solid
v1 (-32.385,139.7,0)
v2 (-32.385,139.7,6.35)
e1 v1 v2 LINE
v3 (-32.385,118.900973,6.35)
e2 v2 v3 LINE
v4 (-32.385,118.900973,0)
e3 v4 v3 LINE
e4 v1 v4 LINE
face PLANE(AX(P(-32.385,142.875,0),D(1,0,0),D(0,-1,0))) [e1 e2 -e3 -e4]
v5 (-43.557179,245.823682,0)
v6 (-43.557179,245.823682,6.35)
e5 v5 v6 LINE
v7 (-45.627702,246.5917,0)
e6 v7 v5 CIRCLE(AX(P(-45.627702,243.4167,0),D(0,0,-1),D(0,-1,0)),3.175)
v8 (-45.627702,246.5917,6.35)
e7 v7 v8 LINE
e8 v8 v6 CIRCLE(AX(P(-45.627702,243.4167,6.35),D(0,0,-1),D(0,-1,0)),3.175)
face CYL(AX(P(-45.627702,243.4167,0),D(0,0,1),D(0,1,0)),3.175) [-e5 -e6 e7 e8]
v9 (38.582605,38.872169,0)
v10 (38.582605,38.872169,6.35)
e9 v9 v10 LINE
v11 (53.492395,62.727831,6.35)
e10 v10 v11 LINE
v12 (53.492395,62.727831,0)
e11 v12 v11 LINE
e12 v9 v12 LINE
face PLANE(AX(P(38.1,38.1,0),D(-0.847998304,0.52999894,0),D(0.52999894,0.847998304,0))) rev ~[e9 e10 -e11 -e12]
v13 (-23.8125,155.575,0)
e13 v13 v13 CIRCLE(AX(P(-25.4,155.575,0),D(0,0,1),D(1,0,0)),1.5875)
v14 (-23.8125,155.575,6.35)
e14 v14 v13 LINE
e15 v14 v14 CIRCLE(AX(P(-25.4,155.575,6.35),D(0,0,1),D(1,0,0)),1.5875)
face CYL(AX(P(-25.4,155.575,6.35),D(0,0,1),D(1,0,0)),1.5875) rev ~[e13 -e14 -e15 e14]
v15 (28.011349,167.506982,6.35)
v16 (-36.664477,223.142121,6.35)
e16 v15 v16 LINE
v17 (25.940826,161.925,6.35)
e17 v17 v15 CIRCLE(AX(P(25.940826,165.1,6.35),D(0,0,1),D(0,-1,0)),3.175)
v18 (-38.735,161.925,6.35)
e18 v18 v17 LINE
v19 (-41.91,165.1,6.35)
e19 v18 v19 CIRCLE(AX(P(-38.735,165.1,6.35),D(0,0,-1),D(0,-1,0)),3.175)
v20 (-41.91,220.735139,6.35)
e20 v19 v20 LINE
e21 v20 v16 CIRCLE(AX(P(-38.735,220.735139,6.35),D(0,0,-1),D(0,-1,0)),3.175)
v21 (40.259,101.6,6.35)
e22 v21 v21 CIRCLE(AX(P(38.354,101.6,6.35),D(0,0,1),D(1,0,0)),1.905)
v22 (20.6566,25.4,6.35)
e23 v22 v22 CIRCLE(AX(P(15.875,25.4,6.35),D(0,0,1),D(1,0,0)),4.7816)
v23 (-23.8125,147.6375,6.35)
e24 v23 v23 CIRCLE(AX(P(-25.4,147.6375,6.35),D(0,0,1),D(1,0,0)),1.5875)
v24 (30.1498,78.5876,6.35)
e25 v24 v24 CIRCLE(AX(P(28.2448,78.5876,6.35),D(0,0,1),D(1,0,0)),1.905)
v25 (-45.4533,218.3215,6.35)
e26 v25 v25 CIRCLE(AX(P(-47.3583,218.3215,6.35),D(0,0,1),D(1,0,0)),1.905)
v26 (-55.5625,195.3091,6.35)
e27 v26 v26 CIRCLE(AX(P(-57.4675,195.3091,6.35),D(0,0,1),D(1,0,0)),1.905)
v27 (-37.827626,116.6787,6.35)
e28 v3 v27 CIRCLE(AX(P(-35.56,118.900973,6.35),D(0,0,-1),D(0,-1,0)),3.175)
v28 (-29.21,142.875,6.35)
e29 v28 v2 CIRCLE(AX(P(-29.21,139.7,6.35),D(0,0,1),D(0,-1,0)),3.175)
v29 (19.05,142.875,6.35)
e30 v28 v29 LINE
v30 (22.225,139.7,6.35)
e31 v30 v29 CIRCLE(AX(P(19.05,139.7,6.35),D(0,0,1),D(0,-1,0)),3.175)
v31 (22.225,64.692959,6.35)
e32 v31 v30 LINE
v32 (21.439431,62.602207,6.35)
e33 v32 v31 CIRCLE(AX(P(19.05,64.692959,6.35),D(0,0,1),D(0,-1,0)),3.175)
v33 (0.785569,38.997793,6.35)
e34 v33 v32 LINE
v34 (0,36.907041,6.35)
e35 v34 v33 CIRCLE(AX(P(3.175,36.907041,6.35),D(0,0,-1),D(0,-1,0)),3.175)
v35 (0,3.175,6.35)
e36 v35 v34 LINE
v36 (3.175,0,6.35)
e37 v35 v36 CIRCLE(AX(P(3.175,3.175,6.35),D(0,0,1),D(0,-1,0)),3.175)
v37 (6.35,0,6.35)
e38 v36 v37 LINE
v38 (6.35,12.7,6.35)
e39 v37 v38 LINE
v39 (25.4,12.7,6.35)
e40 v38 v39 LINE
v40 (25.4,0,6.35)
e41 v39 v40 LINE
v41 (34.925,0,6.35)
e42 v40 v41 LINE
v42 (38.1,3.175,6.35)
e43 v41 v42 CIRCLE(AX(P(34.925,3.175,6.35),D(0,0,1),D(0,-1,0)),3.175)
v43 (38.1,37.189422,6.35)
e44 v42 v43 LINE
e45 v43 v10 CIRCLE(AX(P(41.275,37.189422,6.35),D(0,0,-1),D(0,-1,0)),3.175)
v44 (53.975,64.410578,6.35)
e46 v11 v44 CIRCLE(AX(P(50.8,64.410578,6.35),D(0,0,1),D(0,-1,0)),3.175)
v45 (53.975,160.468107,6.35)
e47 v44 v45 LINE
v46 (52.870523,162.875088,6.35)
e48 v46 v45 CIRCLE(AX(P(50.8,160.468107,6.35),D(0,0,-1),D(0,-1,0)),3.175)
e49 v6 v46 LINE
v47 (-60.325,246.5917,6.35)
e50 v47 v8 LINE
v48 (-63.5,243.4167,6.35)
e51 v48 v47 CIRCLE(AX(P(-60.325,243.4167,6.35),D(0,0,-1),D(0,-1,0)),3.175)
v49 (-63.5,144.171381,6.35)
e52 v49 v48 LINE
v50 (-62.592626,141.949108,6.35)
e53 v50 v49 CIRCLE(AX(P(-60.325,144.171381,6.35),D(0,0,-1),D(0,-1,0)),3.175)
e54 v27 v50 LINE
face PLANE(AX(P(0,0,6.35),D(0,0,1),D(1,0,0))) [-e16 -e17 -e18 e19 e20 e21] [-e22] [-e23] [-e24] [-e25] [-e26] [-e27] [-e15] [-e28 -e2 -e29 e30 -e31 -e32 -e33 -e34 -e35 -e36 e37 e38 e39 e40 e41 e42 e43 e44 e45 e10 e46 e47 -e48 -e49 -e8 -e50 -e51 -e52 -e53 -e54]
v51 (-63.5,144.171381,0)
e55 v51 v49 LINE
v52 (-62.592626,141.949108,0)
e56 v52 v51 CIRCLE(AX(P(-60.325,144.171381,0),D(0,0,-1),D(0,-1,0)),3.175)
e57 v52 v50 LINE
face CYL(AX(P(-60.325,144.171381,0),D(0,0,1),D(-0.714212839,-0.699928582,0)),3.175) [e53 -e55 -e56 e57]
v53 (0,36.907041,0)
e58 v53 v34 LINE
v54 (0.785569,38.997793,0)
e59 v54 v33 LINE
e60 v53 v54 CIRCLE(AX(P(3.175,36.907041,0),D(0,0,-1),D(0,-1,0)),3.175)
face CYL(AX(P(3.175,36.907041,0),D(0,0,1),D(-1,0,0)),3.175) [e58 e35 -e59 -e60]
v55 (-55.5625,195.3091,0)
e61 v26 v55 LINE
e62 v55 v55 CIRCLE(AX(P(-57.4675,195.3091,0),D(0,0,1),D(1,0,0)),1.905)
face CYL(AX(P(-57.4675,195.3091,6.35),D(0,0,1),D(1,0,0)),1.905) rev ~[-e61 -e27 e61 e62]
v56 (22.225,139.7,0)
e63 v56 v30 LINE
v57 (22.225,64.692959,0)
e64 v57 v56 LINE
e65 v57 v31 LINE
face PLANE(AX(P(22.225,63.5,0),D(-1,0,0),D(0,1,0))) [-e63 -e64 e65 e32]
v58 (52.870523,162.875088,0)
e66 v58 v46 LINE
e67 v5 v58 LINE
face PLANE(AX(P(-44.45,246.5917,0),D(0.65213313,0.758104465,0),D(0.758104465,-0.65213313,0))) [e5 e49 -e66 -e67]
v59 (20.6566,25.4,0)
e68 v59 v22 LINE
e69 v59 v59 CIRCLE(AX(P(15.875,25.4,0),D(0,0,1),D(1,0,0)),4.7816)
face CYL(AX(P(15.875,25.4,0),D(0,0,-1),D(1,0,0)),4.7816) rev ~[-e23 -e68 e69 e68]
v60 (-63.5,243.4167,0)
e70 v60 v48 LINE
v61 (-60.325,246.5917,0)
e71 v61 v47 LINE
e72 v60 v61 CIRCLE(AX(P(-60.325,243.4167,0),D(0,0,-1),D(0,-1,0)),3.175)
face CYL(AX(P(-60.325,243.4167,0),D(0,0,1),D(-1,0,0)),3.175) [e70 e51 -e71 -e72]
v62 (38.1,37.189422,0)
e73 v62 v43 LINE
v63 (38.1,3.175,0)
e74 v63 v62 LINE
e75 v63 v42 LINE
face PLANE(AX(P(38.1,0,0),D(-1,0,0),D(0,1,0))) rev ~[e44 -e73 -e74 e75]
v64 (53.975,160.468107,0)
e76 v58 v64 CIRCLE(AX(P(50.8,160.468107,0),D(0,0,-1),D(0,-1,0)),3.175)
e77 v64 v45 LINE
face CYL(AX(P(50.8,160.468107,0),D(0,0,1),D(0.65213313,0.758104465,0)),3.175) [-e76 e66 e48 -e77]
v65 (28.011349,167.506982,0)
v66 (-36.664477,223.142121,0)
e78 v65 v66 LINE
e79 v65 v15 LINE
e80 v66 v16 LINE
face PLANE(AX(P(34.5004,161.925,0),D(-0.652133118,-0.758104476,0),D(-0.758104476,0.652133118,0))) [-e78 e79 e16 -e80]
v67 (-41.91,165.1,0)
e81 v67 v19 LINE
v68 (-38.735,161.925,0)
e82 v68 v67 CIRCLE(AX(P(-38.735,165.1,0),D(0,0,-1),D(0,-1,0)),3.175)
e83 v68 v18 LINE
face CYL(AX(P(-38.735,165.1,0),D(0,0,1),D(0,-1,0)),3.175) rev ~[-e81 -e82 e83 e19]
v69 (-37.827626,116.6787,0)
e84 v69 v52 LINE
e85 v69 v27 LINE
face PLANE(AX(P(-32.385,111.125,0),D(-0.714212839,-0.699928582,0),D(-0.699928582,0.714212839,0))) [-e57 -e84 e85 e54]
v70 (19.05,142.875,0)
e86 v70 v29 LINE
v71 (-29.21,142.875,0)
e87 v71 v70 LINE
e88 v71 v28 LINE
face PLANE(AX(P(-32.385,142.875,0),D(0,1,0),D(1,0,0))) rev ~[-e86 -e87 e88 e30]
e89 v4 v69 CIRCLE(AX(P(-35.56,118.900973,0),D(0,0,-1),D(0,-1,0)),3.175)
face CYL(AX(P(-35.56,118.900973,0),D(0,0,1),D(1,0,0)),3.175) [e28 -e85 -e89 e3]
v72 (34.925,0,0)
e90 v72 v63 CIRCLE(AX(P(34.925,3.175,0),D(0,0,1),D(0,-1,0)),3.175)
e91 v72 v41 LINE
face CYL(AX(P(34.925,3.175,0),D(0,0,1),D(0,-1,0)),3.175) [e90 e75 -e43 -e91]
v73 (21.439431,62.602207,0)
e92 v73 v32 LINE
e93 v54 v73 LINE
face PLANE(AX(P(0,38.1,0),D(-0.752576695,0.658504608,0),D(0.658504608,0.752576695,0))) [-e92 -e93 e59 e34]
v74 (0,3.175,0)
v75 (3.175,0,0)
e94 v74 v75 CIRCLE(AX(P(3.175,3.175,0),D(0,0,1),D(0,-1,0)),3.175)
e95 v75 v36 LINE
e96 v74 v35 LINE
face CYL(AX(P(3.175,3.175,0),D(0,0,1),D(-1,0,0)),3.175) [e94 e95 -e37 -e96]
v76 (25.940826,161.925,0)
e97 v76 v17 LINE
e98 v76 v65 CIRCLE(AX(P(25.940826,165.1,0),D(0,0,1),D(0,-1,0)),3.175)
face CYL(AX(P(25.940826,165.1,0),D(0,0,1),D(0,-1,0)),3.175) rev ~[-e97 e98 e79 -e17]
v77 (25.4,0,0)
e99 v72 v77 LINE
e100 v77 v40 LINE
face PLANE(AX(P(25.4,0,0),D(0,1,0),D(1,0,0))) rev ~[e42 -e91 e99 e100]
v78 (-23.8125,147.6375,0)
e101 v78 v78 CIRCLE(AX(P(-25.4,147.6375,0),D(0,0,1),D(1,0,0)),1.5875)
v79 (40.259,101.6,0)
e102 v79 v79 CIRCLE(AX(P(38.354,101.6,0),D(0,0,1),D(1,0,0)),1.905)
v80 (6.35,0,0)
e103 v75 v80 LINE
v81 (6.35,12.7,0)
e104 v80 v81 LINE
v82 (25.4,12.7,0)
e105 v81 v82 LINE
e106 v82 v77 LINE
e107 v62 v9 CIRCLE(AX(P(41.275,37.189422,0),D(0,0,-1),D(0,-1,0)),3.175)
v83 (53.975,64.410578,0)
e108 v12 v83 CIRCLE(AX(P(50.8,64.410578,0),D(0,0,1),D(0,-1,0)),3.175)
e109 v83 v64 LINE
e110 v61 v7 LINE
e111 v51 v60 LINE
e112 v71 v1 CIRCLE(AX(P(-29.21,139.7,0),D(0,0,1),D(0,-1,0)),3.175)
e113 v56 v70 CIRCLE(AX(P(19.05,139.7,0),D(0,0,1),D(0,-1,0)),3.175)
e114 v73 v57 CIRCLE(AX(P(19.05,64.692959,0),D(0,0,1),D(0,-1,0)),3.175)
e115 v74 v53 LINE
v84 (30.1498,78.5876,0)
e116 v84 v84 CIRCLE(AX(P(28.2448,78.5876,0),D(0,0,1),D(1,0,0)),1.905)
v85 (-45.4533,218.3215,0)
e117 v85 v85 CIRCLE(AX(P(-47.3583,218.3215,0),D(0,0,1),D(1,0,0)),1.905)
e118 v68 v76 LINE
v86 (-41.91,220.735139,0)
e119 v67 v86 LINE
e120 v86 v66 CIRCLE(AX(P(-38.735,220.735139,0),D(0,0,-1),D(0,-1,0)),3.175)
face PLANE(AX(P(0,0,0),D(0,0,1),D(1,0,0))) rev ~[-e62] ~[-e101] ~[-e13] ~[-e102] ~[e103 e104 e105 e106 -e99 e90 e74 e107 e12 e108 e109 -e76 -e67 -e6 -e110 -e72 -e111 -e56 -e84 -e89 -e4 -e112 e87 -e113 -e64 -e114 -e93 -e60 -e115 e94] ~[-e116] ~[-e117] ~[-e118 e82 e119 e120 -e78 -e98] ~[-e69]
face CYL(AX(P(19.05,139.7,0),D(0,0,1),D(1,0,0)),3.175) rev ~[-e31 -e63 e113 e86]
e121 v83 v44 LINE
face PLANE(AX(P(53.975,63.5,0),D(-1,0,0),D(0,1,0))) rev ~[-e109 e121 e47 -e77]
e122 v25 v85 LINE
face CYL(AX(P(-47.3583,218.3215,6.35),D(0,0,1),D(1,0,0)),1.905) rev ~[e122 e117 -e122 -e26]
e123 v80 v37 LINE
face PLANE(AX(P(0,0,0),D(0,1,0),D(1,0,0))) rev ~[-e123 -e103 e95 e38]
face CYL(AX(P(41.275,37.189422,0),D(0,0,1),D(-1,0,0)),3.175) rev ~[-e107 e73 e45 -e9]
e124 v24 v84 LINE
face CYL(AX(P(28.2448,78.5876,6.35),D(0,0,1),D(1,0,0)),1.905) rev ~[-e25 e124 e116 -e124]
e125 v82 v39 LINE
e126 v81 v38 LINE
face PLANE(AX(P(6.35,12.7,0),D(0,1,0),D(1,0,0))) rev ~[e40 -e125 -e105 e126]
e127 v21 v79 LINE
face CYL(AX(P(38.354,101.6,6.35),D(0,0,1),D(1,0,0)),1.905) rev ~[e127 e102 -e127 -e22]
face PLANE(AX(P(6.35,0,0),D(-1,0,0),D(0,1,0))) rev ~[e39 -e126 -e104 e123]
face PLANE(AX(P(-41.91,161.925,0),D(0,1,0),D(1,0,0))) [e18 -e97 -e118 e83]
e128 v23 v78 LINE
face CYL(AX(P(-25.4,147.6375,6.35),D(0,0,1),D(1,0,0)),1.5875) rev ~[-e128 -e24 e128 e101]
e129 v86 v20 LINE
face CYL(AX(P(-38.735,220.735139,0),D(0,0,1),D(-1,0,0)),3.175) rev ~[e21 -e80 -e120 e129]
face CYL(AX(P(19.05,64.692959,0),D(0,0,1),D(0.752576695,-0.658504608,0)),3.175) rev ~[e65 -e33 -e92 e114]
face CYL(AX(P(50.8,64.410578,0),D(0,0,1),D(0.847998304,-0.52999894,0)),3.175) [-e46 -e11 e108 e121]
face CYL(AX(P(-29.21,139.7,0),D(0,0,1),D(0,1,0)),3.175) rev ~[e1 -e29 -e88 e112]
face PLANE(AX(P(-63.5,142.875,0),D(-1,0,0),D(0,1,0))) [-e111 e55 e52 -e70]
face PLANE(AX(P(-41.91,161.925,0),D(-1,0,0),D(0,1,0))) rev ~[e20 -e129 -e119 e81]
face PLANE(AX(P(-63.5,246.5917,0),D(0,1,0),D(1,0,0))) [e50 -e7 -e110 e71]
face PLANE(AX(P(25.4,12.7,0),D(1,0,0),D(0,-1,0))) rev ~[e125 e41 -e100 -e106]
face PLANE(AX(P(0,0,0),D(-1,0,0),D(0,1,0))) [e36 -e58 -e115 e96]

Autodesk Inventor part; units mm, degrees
ref_plane "YZ Plane" through (0, 0, 0) normal (1, 0, 0) x (0, 1, 0)
ref_plane "XZ Plane" through (0, 0, 0) normal (0, 1, 0) x (-1, 0, 0)
ref_plane "XY Plane" through (0, 0, 0) normal (0, 0, 1) x (1, 0, 0)
sketch "Sketch1" plane through (0, 0, 0) normal (0, 0, 1) x (1, 0, 0)
  line L0 (0, 0) -> (6.35, 0)
  line L1 (6.35, 0) -> (6.35, 12.7)
  line L2 (6.35, 12.7) -> (25.4, 12.7)
  line L3 (25.4, 12.7) -> (25.4, 0)
  line L4 (25.4, 0) -> (31.75, 0)
  circle A0 centre (15.875, 25.4) radius 4.7816
  line L5 (-32.385, 142.875) -> (-32.385, 111.125)
  line L6 (-32.385, 142.875) -> (22.225, 142.875)
  line L7 (31.75, 38.1) -> (0, 38.1) construction
  line L8 (53.975, -44.5659) -> (53.975, 161.925) construction
  line L9 (0, 38.1) -> (22.225, 63.5)
  line L10 (53.975, 63.5) -> (53.975, 161.925)
  line L11 (0, 0) -> (0, 38.1)
  line L12 (31.75, 0) -> (38.1, 0)
  line L13 (38.1, 0) -> (38.1, 38.1)
  line L14 (38.1, 38.1) -> (53.975, 63.5)
  line L15 (53.975, 63.5) -> (53.975, 161.925)
  line L16 (22.225, 63.5) -> (22.225, 142.875)
  line L17 (-32.385, 142.875) -> (22.225, 142.875)
  line L18 (0, 0) -> (0, 38.1)
  line L19 (0, 38.1) -> (22.225, 63.5)
  line L20 (22.225, 63.5) -> (22.225, 142.875)
  line L21 (22.225, 142.875) -> (-32.385, 142.875)
  line L22 (-32.385, 142.875) -> (-32.385, 111.125)
  line L23 (6.35, 12.7) -> (25.4, 12.7)
  line L24 (25.4, 12.7) -> (25.4, 0)
  line L25 (38.1, 0) -> (25.4, 0)
  line L26 (38.1, 0) -> (38.1, 38.1)
  line L27 (53.975, 63.5) -> (38.1, 38.1)
  line L28 (53.975, 63.5) -> (53.975, 161.925)
  line L29 (38.1, 0) -> (25.4, 0)
  line L30 (-63.5, -52.3717) -> (-63.5, 366.3054) construction
  line L31 (-63.5, 142.875) -> (-63.5, 246.5917)
  line L32 (-63.5, 246.5917) -> (-44.45, 246.5917)
  line L33 (-32.385, 111.125) -> (-63.5, 142.875)
  line L34 (-44.45, 246.5917) -> (53.975, 161.925)
  line L35 (-41.91, 161.925) -> (34.5004, 161.925)
  line L36 (34.5004, 161.925) -> (-41.91, 227.6544)
  line L37 (-41.91, 161.925) -> (-41.91, 227.6544)
  dimension "d0" = 6.35
  dimension "d1" = 12.7
  dimension "d2" = 19.05
  dimension "d3" = 6.35
  dimension "d5" = 9.5631
  dimension "d6" = 12.7
  dimension "d7" = 9.525
  dimension "d11" = 31.75
  dimension "d23" = 25.4
  dimension "d24" = 38.1
  dimension "d25" = 25.4
  dimension "d26" = 38.1
  dimension "d27" = 54.61
  dimension "d32" = 6.35
  dimension "d33" = 22.225
  dimension "d34" = 38.1
  dimension "d36" = 79.375
  dimension "d60" = 117.475
  dimension "d61" = 103.7167
  dimension "d62" = 19.05
  dimension "d64" = 31.75
  dimension "d66" = 31.115
  dimension "d88" = 12.7
  dimension "d89" = 40.703
  dimension "d91" = 21.59
  dimension "d92" = 19.05
ref_plane "Work Plane1" through (0, 0, 9.525) normal (0, 0, 1) x (1, 0, 0)
ref_plane "Work Plane2" through (0, 0, 9.525) normal (0, 0, 1) x (1, 0, 0)
extrude "Extrusion6" add sketch "Sketch1" along normal blind 6.35
sketch "Sketch5" plane through (0, 0, 6.35) normal (0, 0, 1) x (1, 0, 0)
  line L0 (-44.45, 246.5917) -> (-63.5, 246.5917) projected
  line L1 (-63.5, 246.5917) -> (-63.5, 142.875) projected
  circle A0 centre (-47.3583, 218.3215) radius 1.905
  circle A1 centre (-57.4675, 195.3091) radius 1.905
  dimension "d95" = 3.81
  dimension "d96" = 3.81
  dimension "d97" = 28.2702
  dimension "d98" = 51.2826
  dimension "d99" = 6.0325
  dimension "d100" = 16.1417
extrude "Extrusion7" cut sketch "Sketch5" against normal blind 9.525
fillet "Fillet3" radius 3.175 16 edges at (-44.45, 246.5917, 3.175) (-63.5, 246.5917, 3.175) (53.975, 161.925, 3.175) (-41.91, 161.925, 3.175) (53.975, 63.5, 3.175) (38.1, 38.1, 3.175) (38.1, 0, 3.175) (0, 0, 3.175) (0, 38.1, 3.175) (22.225, 63.5, 3.175) (22.225, 142.875, 3.175) (-32.385, 111.125, 3.175) (-63.5, 142.875, 3.175) (-32.385, 142.875, 3.175) (-41.91, 227.6544, 3.175) (34.5004, 161.925, 3.175)
sketch "Sketch6" plane through (0, 0, 6.35) normal (0, 0, 1) x (1, 0, 0)
  line L0 (-29.21, 142.875) -> (19.05, 142.875) projected
  line L1 (25.9409, 161.925) -> (-38.735, 161.925) projected
  circle A0 centre (-25.4, 155.575) radius 1.5875
  circle A1 centre (-25.4, 147.6375) radius 1.5875
  line L2 (-63.5, 243.4167) -> (-63.5, 144.1714) projected
  point P0 (0, 0)
  dimension "d104" = 3.175
  dimension "d105" = 3.175
  dimension "d106" = 4.7625
  dimension "d107" = 6.35
  dimension "d110" = 38.1
  dimension "d111" = 38.1
extrude "Extrusion8" cut sketch "Sketch6" against normal blind 9.525
sketch "Sketch7" plane through (0, 0, 6.35) normal (0, 0, 1) x (1, 0, 0)
  line L0 (-29.21, 142.875) -> (19.05, 142.875) projected
  line L1 (22.225, 139.7) -> (22.225, 64.693) projected
  line L2 (-44.45, 165.1) -> (-44.45, 222.9201) projected
  line L3 (122.6353, 104.775) -> (-142.2483, 104.775) construction
  circle A0 centre (38.354, 101.6) radius 1.905
  circle A1 centre (28.2448, 78.5876) radius 1.905
  point P0 (0, 0)
  dimension "d112" = 38.1
  dimension "d113" = 3.81
  dimension "d114" = 3.81
  dimension "d115" = 23.0124
  dimension "d116" = 10.1092
  dimension "d117" = 6.0198
  dimension "d118" = 3.175
extrude "Extrusion9" cut sketch "Sketch7" against normal blind 9.525
properties part number "Bent Right Hook" material "Aluminum 6061"
